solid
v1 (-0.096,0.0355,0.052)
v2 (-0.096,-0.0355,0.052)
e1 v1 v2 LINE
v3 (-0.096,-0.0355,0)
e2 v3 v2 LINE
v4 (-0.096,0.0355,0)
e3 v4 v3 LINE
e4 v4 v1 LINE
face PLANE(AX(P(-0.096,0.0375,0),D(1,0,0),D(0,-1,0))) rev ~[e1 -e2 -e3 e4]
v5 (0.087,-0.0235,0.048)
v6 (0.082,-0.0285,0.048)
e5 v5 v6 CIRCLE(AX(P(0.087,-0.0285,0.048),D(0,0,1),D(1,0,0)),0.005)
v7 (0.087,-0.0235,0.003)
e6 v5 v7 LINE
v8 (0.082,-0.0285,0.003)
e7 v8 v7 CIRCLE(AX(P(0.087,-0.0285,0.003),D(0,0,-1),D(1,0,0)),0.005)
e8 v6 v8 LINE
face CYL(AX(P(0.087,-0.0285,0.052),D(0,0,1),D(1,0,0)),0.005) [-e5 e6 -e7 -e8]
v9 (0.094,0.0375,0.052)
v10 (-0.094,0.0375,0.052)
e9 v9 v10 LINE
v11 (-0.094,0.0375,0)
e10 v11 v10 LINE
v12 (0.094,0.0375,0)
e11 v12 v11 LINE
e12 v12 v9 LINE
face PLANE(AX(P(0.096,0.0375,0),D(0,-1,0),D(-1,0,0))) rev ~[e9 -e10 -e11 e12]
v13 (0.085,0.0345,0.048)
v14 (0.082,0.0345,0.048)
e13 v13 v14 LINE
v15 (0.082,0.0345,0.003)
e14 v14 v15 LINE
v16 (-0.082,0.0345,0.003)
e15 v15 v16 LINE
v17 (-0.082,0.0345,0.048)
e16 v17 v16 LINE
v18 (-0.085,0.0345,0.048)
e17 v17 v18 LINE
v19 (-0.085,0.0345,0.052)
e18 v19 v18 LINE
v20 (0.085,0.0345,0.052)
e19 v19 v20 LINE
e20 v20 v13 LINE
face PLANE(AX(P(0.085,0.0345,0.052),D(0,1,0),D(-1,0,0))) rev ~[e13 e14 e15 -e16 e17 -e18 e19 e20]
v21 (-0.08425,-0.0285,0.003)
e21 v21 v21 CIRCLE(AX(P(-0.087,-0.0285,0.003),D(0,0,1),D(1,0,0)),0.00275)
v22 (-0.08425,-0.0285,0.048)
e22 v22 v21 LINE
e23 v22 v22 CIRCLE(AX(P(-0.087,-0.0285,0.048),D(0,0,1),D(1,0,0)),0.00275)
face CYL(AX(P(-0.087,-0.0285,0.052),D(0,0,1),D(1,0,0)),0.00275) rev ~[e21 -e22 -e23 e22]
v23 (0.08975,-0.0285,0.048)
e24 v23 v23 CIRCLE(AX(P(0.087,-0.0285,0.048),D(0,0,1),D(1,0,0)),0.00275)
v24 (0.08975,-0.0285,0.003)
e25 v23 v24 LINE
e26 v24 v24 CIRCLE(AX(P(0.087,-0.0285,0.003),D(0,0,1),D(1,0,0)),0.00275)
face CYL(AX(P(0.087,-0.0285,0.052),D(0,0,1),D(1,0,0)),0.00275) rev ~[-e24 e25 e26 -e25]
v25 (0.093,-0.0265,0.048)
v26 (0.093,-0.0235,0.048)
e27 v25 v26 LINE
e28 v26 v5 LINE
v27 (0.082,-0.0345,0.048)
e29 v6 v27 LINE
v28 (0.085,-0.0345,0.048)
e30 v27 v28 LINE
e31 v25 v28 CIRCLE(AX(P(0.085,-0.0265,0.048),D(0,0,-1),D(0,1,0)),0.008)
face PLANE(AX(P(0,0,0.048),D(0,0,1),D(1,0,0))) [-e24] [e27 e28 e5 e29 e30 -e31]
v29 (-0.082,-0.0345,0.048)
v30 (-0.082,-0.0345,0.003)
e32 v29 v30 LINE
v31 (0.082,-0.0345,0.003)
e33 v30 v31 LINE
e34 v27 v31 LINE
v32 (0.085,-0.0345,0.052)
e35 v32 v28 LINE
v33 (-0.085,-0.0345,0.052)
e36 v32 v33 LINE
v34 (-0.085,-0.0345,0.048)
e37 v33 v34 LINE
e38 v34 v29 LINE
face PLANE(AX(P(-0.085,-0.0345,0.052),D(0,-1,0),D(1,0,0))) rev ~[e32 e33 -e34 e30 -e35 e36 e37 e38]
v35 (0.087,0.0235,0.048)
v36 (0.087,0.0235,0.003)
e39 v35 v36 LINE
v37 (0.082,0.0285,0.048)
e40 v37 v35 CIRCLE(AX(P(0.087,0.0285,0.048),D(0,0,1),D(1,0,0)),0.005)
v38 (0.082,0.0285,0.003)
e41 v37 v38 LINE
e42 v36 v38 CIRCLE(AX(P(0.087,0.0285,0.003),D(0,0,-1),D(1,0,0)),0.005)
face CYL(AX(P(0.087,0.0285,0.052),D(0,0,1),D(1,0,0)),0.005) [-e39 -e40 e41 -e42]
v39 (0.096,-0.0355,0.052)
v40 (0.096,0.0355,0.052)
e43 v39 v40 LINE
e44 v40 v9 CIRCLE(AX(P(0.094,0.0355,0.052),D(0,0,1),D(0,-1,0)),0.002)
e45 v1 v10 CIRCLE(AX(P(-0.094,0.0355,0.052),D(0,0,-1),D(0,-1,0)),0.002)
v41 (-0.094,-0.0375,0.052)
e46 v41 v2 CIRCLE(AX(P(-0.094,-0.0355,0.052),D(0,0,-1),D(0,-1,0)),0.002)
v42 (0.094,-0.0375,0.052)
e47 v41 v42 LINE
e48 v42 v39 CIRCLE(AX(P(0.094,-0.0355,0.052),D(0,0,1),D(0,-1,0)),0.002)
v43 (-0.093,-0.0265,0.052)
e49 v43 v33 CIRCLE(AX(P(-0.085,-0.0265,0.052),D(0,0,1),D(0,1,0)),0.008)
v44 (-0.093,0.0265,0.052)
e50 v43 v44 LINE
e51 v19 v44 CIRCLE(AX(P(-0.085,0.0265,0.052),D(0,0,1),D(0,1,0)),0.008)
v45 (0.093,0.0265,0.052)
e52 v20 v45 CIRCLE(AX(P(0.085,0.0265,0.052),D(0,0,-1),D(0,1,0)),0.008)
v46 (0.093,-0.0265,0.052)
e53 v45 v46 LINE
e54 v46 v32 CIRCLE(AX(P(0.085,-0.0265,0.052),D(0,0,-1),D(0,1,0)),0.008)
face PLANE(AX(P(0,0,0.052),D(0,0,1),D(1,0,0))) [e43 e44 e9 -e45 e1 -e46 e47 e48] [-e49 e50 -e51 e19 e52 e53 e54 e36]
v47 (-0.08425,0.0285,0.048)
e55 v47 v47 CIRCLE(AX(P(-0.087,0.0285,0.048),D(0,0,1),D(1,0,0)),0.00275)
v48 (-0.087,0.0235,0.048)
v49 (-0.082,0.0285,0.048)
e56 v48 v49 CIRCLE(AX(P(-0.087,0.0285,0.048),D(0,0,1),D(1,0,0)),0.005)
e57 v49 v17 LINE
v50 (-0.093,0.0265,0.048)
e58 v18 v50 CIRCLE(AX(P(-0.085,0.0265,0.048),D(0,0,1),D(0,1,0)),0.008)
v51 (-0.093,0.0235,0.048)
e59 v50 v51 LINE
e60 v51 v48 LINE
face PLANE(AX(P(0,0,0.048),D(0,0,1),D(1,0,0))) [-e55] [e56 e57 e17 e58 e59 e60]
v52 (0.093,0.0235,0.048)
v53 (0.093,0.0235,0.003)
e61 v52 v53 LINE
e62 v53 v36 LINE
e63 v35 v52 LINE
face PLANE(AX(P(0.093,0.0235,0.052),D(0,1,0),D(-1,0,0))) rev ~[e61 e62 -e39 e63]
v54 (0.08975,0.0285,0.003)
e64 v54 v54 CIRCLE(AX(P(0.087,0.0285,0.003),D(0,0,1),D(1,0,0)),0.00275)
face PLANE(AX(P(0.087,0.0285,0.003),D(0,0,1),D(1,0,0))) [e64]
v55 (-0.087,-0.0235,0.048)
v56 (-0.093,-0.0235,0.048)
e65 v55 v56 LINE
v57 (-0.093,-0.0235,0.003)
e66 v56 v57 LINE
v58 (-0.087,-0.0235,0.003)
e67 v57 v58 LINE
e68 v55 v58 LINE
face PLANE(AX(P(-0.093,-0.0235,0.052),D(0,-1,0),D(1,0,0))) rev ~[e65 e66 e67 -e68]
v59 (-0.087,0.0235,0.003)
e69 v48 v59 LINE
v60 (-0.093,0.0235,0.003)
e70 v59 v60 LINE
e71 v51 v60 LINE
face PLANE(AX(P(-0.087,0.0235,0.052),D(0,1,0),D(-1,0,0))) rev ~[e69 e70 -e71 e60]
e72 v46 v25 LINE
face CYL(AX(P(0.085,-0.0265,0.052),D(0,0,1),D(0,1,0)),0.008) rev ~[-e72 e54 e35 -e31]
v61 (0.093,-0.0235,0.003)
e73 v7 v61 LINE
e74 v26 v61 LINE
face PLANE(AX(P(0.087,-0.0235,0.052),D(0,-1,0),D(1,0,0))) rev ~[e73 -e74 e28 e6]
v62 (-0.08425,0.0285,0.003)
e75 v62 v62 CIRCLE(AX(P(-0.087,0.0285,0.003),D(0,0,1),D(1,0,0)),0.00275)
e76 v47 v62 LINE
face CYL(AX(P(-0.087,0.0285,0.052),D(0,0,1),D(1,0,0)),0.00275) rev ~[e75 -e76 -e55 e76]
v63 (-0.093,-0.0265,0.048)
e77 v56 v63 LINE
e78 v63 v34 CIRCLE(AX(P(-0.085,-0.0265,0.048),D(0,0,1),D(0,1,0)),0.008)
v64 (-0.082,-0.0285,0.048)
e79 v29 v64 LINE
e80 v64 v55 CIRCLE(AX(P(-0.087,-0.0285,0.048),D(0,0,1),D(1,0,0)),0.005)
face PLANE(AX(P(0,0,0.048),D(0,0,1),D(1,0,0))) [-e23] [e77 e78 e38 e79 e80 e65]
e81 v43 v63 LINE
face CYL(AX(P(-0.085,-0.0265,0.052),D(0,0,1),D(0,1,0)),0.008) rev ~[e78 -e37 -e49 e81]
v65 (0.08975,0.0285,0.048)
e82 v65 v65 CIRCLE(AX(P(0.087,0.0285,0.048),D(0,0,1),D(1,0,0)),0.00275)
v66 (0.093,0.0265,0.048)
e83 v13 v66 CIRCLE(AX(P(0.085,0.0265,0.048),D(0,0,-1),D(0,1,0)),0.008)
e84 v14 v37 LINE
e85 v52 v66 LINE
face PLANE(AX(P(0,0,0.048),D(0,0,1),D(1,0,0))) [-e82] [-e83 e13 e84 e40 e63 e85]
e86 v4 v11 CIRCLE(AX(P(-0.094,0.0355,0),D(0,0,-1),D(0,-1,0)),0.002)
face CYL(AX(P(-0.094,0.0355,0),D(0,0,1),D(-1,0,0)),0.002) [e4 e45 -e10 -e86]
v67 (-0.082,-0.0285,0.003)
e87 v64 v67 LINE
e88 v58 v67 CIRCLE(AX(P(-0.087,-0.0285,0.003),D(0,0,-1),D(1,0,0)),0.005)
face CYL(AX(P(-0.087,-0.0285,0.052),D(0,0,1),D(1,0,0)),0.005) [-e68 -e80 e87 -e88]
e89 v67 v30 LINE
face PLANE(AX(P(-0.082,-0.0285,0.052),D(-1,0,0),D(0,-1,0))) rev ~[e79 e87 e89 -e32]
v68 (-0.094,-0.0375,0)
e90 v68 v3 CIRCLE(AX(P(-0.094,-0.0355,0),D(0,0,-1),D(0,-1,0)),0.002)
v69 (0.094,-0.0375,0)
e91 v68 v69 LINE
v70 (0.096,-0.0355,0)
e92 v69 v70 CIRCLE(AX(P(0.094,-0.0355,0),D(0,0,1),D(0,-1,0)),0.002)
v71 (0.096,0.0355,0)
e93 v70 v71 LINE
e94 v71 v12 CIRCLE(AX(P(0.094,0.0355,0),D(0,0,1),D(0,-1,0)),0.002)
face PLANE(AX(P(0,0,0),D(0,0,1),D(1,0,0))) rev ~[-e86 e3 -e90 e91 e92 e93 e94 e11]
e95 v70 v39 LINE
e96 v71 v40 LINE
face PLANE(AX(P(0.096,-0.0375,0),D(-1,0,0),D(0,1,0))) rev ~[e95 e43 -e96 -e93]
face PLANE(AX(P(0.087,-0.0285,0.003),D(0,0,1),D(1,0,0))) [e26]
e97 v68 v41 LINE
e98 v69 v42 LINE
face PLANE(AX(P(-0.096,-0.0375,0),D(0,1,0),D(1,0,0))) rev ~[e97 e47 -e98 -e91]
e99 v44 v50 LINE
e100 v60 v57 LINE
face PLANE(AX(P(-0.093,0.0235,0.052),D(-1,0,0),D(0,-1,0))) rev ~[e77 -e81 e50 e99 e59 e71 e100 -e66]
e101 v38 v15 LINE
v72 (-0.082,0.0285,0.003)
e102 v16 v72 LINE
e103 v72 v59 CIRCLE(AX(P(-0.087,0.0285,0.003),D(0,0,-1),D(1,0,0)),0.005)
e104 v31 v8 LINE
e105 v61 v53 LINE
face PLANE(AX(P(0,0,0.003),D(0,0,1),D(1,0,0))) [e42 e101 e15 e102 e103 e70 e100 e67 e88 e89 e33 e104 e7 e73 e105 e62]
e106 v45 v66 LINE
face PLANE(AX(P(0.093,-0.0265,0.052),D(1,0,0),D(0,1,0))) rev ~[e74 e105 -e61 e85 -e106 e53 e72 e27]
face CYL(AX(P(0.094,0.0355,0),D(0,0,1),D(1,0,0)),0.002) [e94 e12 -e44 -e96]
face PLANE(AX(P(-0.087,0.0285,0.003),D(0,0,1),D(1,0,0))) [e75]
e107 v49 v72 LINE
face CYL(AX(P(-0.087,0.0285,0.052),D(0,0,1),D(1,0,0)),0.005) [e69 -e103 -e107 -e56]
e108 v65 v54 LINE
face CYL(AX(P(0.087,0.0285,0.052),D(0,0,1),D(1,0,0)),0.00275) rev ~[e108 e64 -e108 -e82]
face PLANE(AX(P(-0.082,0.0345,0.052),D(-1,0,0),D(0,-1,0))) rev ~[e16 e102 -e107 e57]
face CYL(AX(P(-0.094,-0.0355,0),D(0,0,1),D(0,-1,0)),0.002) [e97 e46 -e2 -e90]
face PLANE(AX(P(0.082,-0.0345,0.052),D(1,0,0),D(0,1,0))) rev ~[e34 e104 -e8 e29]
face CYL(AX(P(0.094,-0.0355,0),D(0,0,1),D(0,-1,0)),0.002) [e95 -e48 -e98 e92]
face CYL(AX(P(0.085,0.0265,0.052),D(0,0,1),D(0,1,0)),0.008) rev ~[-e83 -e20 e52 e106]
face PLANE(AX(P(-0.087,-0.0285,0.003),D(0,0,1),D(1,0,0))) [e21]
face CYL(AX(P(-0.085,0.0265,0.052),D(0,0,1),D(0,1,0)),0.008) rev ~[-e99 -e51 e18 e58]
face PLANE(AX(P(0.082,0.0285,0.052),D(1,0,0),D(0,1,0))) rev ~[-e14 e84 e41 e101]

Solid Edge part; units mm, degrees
sketch "Sketch1" plane through (0, 0, 0) normal (0, 0, 1) x (1, 0, 0)
  line L0 (-0.096, -0.0375) -> (0.096, -0.0375)
  line L1 (0.096, -0.0375) -> (0.096, 0.0375)
  line L2 (0.096, 0.0375) -> (-0.096, 0.0375)
  line L3 (-0.096, 0.0375) -> (-0.096, -0.0375)
  dimension "D1" = 0.192
  dimension "D2" = 0.075
extrude "Protrusion1" add sketch "Sketch1" along normal blind 0.052
sketch "Sketch2" plane through (0, 0, 0.052) normal (0, 0, 1) x (1, 0, 0)
  line L0 (-0.087, 0.0235) -> (-0.093, 0.0235)
  line L1 (-0.093, 0.0235) -> (-0.093, -0.0235)
  line L2 (-0.093, -0.0235) -> (-0.087, -0.0235)
  arc A0 (-0.087, -0.0235) -> (-0.082, -0.0285) centre (-0.087, -0.0285) cw
  line L3 (-0.082, -0.0285) -> (-0.082, -0.0345)
  line L4 (-0.082, -0.0345) -> (0.082, -0.0345)
  line L5 (0.082, -0.0345) -> (0.082, -0.0285)
  arc A1 (0.082, -0.0285) -> (0.087, -0.0235) centre (0.087, -0.0285) cw
  line L6 (0.087, -0.0235) -> (0.093, -0.0235)
  line L7 (0.093, -0.0235) -> (0.093, 0.0235)
  line L8 (0.093, 0.0235) -> (0.087, 0.0235)
  arc A2 (0.087, 0.0235) -> (0.082, 0.0285) centre (0.087, 0.0285) cw
  line L9 (0.082, 0.0285) -> (0.082, 0.0345)
  line L10 (0.082, 0.0345) -> (-0.082, 0.0345)
  line L11 (-0.082, 0.0345) -> (-0.082, 0.0285)
  arc A3 (-0.082, 0.0285) -> (-0.087, 0.0235) centre (-0.087, 0.0285) cw
  circle A4 centre (0.087, 0.0285) radius 0.00275
  circle A5 centre (0.087, -0.0285) radius 0.00275
  circle A6 centre (-0.087, -0.0285) radius 0.00275
  circle A7 centre (-0.087, 0.0285) radius 0.00275
  dimension "D1" = 0.087
  dimension "D2" = 0.087
extrude "Ausschnitt_1" cut sketch "Sketch2" against normal blind 0.049
sketch "Sketch3" plane through (0, 0, 0.052) normal (0, 0, 1) x (0, 1, 0)
  line L0 (0.0265, 0.093) -> (-0.0265, 0.093)
  arc A0 (-0.0265, 0.093) -> (-0.0345, 0.085) centre (-0.0265, 0.085) ccw
  line L1 (-0.0345, 0.085) -> (-0.0345, -0.085)
  arc A1 (-0.0265, -0.093) -> (-0.0345, -0.085) centre (-0.0265, -0.085) cw
  line L2 (-0.0265, -0.093) -> (0.0265, -0.093)
  arc A2 (0.0345, -0.085) -> (0.0265, -0.093) centre (0.0265, -0.085) cw
  line L3 (0.0345, -0.085) -> (0.0345, 0.085)
  arc A3 (0.0345, 0.085) -> (0.0265, 0.093) centre (0.0265, 0.085) ccw
extrude "Ausschnitt_2" cut sketch "Sketch3" against normal blind 0.004
fillet "Verrundung_1" radius 0.002 4 edges at (-0.096, -0.0375, 0.026) (-0.096, 0.0375, 0.026) (0.096, 0.0375, 0.026) (0.096, -0.0375, 0.026)
